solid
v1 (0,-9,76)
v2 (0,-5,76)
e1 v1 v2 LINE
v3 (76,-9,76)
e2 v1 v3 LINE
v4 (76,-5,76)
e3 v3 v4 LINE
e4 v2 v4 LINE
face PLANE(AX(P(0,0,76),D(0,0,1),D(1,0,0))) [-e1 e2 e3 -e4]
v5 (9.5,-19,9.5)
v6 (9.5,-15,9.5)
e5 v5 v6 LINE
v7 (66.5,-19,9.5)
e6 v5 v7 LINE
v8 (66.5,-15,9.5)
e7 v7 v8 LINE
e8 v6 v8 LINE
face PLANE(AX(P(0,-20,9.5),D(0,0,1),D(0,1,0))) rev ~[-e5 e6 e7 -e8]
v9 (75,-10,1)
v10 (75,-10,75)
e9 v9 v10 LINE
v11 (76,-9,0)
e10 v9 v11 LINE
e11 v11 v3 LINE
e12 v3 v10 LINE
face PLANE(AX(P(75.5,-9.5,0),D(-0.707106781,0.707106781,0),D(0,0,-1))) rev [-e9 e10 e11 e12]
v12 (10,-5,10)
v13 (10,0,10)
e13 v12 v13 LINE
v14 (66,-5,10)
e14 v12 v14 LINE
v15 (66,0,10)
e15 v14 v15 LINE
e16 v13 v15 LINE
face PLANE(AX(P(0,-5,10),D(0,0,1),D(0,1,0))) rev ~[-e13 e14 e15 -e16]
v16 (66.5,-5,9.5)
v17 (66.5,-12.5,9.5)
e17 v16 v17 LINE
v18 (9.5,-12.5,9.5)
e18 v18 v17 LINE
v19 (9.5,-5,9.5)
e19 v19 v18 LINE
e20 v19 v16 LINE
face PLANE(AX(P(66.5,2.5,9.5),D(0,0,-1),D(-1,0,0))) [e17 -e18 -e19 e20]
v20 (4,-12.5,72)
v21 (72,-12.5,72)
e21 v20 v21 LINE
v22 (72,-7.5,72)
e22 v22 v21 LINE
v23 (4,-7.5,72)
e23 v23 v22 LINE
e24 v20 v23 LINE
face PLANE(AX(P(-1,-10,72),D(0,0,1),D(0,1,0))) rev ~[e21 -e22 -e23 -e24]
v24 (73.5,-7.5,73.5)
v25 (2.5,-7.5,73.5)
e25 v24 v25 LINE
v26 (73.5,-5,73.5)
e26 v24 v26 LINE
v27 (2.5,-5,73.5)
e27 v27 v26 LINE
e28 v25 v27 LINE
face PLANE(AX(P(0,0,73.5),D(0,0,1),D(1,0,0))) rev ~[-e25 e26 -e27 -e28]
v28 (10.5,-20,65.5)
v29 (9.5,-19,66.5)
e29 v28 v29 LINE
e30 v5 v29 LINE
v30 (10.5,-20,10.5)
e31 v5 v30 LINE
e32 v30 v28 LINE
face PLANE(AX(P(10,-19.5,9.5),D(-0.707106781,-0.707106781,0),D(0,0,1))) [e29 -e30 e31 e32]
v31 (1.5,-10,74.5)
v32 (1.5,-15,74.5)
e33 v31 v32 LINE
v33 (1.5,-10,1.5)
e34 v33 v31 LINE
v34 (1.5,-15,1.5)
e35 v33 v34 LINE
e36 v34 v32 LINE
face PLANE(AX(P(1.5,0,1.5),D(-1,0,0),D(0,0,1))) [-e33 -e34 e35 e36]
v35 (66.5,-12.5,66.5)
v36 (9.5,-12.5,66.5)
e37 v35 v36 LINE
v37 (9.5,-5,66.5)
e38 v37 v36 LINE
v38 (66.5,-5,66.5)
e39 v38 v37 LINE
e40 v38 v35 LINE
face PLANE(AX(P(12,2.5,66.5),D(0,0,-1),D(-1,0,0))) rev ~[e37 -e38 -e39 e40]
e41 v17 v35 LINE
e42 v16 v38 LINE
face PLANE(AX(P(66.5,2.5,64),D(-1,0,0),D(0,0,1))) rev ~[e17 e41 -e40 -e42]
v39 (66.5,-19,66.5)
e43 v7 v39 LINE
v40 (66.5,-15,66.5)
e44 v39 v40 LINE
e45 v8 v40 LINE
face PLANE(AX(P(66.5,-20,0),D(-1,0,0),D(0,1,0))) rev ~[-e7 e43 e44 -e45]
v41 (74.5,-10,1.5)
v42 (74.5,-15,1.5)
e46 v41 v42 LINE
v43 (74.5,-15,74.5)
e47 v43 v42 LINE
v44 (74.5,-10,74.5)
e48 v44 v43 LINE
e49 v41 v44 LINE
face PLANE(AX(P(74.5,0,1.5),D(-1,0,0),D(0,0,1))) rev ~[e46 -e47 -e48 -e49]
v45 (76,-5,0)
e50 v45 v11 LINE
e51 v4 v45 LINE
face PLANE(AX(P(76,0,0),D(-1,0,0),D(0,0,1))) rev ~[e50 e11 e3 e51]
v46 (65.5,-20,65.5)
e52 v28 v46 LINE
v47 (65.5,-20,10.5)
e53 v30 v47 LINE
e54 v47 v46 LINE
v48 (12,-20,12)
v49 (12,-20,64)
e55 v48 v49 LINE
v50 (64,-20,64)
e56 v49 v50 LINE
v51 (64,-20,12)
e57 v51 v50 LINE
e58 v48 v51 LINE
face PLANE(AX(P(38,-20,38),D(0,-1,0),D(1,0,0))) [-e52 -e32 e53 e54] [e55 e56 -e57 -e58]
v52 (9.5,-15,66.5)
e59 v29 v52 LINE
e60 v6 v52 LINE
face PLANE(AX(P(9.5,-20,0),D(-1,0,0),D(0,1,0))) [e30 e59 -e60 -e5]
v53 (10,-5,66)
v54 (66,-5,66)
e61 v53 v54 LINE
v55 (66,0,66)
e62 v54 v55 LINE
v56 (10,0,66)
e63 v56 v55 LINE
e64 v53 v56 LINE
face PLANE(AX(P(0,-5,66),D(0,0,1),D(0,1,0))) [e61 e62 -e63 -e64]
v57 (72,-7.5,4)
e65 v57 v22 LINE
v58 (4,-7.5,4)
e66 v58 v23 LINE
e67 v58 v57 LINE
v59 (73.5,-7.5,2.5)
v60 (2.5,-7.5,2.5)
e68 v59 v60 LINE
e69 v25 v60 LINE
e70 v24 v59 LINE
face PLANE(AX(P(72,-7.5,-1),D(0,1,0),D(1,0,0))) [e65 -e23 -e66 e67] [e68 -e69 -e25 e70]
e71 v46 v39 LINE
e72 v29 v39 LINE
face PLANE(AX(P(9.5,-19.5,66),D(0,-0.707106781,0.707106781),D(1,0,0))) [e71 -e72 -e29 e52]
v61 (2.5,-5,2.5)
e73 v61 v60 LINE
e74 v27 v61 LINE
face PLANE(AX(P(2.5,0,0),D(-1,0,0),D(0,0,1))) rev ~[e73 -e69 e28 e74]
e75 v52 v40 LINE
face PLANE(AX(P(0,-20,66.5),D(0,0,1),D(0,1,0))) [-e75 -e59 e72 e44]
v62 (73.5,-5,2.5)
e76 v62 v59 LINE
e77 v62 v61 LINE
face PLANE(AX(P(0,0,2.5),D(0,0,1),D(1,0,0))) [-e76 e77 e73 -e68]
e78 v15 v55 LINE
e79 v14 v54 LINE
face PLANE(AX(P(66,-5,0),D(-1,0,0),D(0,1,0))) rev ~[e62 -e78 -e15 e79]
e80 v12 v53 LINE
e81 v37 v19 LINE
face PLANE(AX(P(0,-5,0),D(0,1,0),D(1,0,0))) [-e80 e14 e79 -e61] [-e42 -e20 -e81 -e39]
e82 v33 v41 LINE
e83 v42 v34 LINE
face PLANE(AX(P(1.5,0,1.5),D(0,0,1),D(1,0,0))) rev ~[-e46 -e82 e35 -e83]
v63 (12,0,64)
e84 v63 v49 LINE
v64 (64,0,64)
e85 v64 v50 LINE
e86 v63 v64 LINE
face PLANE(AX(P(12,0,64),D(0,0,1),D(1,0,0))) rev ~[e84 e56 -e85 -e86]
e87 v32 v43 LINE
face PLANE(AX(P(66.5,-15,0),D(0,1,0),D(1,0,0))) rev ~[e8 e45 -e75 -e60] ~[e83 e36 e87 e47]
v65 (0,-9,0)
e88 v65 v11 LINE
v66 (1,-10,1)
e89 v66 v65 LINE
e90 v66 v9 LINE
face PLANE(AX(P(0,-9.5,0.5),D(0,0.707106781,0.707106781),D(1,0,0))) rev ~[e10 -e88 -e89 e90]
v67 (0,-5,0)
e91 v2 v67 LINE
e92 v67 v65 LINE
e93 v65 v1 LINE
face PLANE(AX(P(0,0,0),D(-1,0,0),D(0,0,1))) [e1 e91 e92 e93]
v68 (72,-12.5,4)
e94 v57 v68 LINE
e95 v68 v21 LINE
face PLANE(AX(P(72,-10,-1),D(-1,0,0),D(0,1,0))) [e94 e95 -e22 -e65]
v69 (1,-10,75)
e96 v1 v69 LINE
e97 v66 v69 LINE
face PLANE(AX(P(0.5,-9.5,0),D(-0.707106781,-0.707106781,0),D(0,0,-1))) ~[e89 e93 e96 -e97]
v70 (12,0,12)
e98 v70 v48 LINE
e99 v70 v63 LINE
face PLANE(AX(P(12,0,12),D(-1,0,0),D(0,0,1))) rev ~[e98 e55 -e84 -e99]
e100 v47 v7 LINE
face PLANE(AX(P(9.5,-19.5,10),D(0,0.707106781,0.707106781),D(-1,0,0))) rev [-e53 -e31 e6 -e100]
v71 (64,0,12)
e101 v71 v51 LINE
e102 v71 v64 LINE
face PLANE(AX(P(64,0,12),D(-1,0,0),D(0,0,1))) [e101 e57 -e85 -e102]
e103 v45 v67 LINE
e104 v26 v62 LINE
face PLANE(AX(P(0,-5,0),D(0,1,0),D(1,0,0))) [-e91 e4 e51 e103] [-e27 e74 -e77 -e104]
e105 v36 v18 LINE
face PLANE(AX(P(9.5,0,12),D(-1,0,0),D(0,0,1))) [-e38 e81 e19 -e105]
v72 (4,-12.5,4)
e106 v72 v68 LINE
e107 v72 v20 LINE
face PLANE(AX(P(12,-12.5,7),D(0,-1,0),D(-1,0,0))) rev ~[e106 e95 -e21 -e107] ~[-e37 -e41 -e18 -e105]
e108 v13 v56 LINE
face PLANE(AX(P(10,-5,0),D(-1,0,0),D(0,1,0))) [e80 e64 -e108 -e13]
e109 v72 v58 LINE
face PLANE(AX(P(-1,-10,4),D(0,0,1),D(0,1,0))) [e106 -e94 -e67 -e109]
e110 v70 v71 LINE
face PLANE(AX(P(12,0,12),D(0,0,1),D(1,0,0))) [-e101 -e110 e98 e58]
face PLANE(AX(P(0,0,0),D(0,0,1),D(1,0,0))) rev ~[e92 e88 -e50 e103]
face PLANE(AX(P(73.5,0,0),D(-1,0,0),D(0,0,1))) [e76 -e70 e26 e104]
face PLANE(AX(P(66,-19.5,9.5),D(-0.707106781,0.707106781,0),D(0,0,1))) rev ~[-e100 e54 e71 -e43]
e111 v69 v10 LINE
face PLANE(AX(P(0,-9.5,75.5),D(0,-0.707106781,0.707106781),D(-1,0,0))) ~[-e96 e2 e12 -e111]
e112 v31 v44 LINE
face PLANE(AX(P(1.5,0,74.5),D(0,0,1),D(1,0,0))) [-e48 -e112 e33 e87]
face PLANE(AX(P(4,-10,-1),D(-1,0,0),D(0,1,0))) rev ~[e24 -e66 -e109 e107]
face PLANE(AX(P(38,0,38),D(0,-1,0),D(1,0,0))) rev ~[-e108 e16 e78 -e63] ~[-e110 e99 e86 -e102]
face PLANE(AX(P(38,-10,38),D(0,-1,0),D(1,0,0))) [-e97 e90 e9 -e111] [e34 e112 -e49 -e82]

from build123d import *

# Parameters (mm, degrees)
F0_W          = 73
F0_H          = 73
F0_W_2        = 56
F0_H_2        = 56
F0_W_3        = 52
F0_H_3        = 52
F1_DEPTH      = 20
F0_W_4        = 76
F0_H_4        = 76
F2_DEPTH      = 3
F3_DEPTH      = 10
F4_W          = 10
F4_H          = 5
F5_DEPTH      = 80
F6_W          = 5
F6_H          = 10
F7_DEPTH      = 80
F8_W          = 8
F8_H          = 5
F9_DEPTH      = 80
F10_W         = 5
F10_H         = 8
F11_DEPTH     = 80
F12_SIZE      = 1
F13_T         = 2.5
F13_T3_DEPTH  = 62
F13_T5_DEPTH  = 62
F13_T7_DEPTH  = 78
F13_T9_DEPTH  = 78
F13_T11_DEPTH = 25


# Not quite as in the source:
# - a shell that OpenCascade refuses in one call is made with other operations: the cavity is built on its own and cut out


with BuildPart() as f1:
    # F0 (on Front) → F1 (new body)
    with BuildSketch(Plane.XZ):
        with Locations((38, 38)):
            Rectangle(F0_W, F0_H)
        with Locations((38, 38)):
            Rectangle(F0_W_2, F0_H_2, mode=Mode.SUBTRACT)
        with Locations((38, 38)):
            Rectangle(F0_W_2, F0_H_2)
        with Locations((38, 38)):
            Rectangle(F0_W_3, F0_H_3, mode=Mode.SUBTRACT)
    extrude(amount=F1_DEPTH)

    # F0 (on Front) → F2 (join)
    with BuildSketch(Plane.XZ):
        with Locations((38, 38)):
            Rectangle(F0_W_4, F0_H_4)
        with Locations((38, 38)):
            Rectangle(F0_W, F0_H, mode=Mode.SUBTRACT)
    extrude(amount=F2_DEPTH)

    # F0 (on Front) → F3 (join)
    with BuildSketch(Plane.XZ):
        with Locations((38, 38)):
            Rectangle(F0_W_4, F0_H_4)
        with Locations((38, 38)):
            Rectangle(F0_W, F0_H, mode=Mode.SUBTRACT)
    extrude(amount=F3_DEPTH)

    # F4 (on Top) → F5 (cut)
    with BuildSketch(Plane.XY):
        with Locations((5, -2.5)):
            Rectangle(F4_W, F4_H)
        with Locations((71, -2.5)):
            Rectangle(F4_W, F4_H)
    extrude(amount=F5_DEPTH, mode=Mode.SUBTRACT)

    # F6 (on Right) → F7 (cut)
    with BuildSketch(Plane.YZ):
        with Locations((-2.5, 5)):
            Rectangle(F6_W, F6_H)
        with Locations((-2.5, 71)):
            Rectangle(F6_W, F6_H)
    extrude(amount=F7_DEPTH, mode=Mode.SUBTRACT)

    # F8 (on Top) → F9 (cut)
    with BuildSketch(Plane.XY):
        with Locations((5.5, -17.5)):
            Rectangle(F8_W, F8_H)
        with Locations((70.5, -17.5)):
            Rectangle(F8_W, F8_H)
    extrude(amount=F9_DEPTH, mode=Mode.SUBTRACT)

    # F10 (on Right) → F11 (cut)
    with BuildSketch(Plane.YZ):
        with Locations((-17.5, 5.5)):
            Rectangle(F10_W, F10_H)
        with Locations((-17.5, 70.5)):
            Rectangle(F10_W, F10_H)
    extrude(amount=F11_DEPTH, mode=Mode.SUBTRACT)

    # F12
    f12_edges = [f1.edges().sort_by_distance(p)[0] for p in [
        (38, -10, 0),
        (0, -10, 38),
        (76, -10, 38),
        (38, -10, 76),
        (66.5, -20, 38),
        (38, -20, 66.5),
        (38, -20, 9.5),
        (9.5, -20, 38),
    ]]
    chamfer(f12_edges, length=F12_SIZE)

    # F13: shell of thickness 2.5, made by hand


with BuildPart() as f13_core1:
    # F13_t2: copy of F1
    add(f1.part)

    # the walls: a layer under each face that stays
    f13_faces = [f13_core1.faces().sort_by_distance(p)[0] for p in [
        (9.5, -17, 38),
        (38, -17, 66.5),
        (10, -19.5, 38),
        (69.2857142857, -15, 69.2857142857),
        (38, -17, 9.5),
        (38, -19.5, 66),
        (66.5, -17, 38),
        (38, -19.5, 10),
        (56.90625, -20, 11.1790123457),
        (1.5, -12.5, 38),
        (38, -12.5, 1.5),
        (74.5, -12.5, 38),
        (38, -12.5, 74.5),
        (66, -19.5, 38),
        (64, -10, 38),
        (38, -10, 64),
        (38, -10, 12),
        (12, -10, 38),
        (40.890625, -10, 1.304526749),
        (11.8666666667, 0, 11.8666666667),
        (38, -9.5, 0.5),
        (0.5, -9.5, 38),
        (75.5, -9.5, 38),
        (38, -9.5, 75.5),
        (66, -2.5, 38),
        (38, -2.5, 10),
        (10, -2.5, 38),
        (38, -2.5, 66),
        (38, -7, 0),
        (0, -7, 38),
        (76, -7, 38),
        (38, -7, 76),
    ]]
    thicken(f13_faces, amount=-F13_T, mode=Mode.SUBTRACT)

    # F13_s4 → F13_t3 (cut)
    with BuildSketch(Plane.XY.offset(7)):
        Polygon((9.475, -15.025), (12, -15), (12, -12.5), (9.5, -12.5), align=None)
        Polygon((66.525, -15.025), (66.5, -12.5), (64, -12.5), (64, -15), align=None)
    extrude(amount=F13_T3_DEPTH, mode=Mode.SUBTRACT)

    # F13_s6 → F13_t5 (cut)
    with BuildSketch(Plane.YZ.offset(7)):
        Polygon((-15.025, 66.525), (-15, 64), (-12.5, 64), (-12.5, 66.5), align=None)
        Polygon((-15.025, 9.475), (-12.5, 9.5), (-12.5, 12), (-15, 12), align=None)
    extrude(amount=F13_T5_DEPTH, mode=Mode.SUBTRACT)

    # F13_s8 → F13_t7 (cut)
    with BuildSketch(Plane.XY.offset(-1)):
        Polygon((1.475, -10.025), (4, -10), (4, -7.5), (1.5, -7.5), align=None)
        Polygon((74.525, -10.025), (72, -10), (72, -7.5), (74.5, -7.5), align=None)
    extrude(amount=F13_T7_DEPTH, mode=Mode.SUBTRACT)

    # F13_s10 → F13_t9 (cut)
    with BuildSketch(Plane.YZ.offset(-1)):
        Polygon((-10.025, 1.475), (-10, 4), (-7.5, 4), (-7.5, 1.5), align=None)
        Polygon((-10.025, 74.525), (-10, 72), (-7.5, 72), (-7.5, 74.5), align=None)
    extrude(amount=F13_T9_DEPTH, mode=Mode.SUBTRACT)

    # F13_s12 → F13_t11 (cut)
    with BuildSketch(Plane.XZ.offset(-2.5)):
        Polygon((63.975, 63.975), (66.5, 64), (66.5, 66.5), (64, 66.5), align=None)
        Polygon((63.975, 12.025), (66.5, 12), (66.5, 9.5), (64, 9.5), align=None)
        Polygon((12.025, 63.975), (12, 66.5), (9.5, 66.5), (9.5, 64), align=None)
        Polygon((12.025, 12.025), (12, 9.5), (9.5, 9.5), (9.5, 12), align=None)
    extrude(amount=F13_T11_DEPTH, mode=Mode.SUBTRACT)


with BuildPart() as f1_1:
    add(f1.part)

    # what is left inside the walls is the cavity
    f13_cavity = [f13_core1.part.solids().sort_by_distance(p)[0] for p in [
        (65.611111, -5.025, 6.9375),
    ]]
    add(f13_cavity, mode=Mode.SUBTRACT)


solid = f1_1.part
